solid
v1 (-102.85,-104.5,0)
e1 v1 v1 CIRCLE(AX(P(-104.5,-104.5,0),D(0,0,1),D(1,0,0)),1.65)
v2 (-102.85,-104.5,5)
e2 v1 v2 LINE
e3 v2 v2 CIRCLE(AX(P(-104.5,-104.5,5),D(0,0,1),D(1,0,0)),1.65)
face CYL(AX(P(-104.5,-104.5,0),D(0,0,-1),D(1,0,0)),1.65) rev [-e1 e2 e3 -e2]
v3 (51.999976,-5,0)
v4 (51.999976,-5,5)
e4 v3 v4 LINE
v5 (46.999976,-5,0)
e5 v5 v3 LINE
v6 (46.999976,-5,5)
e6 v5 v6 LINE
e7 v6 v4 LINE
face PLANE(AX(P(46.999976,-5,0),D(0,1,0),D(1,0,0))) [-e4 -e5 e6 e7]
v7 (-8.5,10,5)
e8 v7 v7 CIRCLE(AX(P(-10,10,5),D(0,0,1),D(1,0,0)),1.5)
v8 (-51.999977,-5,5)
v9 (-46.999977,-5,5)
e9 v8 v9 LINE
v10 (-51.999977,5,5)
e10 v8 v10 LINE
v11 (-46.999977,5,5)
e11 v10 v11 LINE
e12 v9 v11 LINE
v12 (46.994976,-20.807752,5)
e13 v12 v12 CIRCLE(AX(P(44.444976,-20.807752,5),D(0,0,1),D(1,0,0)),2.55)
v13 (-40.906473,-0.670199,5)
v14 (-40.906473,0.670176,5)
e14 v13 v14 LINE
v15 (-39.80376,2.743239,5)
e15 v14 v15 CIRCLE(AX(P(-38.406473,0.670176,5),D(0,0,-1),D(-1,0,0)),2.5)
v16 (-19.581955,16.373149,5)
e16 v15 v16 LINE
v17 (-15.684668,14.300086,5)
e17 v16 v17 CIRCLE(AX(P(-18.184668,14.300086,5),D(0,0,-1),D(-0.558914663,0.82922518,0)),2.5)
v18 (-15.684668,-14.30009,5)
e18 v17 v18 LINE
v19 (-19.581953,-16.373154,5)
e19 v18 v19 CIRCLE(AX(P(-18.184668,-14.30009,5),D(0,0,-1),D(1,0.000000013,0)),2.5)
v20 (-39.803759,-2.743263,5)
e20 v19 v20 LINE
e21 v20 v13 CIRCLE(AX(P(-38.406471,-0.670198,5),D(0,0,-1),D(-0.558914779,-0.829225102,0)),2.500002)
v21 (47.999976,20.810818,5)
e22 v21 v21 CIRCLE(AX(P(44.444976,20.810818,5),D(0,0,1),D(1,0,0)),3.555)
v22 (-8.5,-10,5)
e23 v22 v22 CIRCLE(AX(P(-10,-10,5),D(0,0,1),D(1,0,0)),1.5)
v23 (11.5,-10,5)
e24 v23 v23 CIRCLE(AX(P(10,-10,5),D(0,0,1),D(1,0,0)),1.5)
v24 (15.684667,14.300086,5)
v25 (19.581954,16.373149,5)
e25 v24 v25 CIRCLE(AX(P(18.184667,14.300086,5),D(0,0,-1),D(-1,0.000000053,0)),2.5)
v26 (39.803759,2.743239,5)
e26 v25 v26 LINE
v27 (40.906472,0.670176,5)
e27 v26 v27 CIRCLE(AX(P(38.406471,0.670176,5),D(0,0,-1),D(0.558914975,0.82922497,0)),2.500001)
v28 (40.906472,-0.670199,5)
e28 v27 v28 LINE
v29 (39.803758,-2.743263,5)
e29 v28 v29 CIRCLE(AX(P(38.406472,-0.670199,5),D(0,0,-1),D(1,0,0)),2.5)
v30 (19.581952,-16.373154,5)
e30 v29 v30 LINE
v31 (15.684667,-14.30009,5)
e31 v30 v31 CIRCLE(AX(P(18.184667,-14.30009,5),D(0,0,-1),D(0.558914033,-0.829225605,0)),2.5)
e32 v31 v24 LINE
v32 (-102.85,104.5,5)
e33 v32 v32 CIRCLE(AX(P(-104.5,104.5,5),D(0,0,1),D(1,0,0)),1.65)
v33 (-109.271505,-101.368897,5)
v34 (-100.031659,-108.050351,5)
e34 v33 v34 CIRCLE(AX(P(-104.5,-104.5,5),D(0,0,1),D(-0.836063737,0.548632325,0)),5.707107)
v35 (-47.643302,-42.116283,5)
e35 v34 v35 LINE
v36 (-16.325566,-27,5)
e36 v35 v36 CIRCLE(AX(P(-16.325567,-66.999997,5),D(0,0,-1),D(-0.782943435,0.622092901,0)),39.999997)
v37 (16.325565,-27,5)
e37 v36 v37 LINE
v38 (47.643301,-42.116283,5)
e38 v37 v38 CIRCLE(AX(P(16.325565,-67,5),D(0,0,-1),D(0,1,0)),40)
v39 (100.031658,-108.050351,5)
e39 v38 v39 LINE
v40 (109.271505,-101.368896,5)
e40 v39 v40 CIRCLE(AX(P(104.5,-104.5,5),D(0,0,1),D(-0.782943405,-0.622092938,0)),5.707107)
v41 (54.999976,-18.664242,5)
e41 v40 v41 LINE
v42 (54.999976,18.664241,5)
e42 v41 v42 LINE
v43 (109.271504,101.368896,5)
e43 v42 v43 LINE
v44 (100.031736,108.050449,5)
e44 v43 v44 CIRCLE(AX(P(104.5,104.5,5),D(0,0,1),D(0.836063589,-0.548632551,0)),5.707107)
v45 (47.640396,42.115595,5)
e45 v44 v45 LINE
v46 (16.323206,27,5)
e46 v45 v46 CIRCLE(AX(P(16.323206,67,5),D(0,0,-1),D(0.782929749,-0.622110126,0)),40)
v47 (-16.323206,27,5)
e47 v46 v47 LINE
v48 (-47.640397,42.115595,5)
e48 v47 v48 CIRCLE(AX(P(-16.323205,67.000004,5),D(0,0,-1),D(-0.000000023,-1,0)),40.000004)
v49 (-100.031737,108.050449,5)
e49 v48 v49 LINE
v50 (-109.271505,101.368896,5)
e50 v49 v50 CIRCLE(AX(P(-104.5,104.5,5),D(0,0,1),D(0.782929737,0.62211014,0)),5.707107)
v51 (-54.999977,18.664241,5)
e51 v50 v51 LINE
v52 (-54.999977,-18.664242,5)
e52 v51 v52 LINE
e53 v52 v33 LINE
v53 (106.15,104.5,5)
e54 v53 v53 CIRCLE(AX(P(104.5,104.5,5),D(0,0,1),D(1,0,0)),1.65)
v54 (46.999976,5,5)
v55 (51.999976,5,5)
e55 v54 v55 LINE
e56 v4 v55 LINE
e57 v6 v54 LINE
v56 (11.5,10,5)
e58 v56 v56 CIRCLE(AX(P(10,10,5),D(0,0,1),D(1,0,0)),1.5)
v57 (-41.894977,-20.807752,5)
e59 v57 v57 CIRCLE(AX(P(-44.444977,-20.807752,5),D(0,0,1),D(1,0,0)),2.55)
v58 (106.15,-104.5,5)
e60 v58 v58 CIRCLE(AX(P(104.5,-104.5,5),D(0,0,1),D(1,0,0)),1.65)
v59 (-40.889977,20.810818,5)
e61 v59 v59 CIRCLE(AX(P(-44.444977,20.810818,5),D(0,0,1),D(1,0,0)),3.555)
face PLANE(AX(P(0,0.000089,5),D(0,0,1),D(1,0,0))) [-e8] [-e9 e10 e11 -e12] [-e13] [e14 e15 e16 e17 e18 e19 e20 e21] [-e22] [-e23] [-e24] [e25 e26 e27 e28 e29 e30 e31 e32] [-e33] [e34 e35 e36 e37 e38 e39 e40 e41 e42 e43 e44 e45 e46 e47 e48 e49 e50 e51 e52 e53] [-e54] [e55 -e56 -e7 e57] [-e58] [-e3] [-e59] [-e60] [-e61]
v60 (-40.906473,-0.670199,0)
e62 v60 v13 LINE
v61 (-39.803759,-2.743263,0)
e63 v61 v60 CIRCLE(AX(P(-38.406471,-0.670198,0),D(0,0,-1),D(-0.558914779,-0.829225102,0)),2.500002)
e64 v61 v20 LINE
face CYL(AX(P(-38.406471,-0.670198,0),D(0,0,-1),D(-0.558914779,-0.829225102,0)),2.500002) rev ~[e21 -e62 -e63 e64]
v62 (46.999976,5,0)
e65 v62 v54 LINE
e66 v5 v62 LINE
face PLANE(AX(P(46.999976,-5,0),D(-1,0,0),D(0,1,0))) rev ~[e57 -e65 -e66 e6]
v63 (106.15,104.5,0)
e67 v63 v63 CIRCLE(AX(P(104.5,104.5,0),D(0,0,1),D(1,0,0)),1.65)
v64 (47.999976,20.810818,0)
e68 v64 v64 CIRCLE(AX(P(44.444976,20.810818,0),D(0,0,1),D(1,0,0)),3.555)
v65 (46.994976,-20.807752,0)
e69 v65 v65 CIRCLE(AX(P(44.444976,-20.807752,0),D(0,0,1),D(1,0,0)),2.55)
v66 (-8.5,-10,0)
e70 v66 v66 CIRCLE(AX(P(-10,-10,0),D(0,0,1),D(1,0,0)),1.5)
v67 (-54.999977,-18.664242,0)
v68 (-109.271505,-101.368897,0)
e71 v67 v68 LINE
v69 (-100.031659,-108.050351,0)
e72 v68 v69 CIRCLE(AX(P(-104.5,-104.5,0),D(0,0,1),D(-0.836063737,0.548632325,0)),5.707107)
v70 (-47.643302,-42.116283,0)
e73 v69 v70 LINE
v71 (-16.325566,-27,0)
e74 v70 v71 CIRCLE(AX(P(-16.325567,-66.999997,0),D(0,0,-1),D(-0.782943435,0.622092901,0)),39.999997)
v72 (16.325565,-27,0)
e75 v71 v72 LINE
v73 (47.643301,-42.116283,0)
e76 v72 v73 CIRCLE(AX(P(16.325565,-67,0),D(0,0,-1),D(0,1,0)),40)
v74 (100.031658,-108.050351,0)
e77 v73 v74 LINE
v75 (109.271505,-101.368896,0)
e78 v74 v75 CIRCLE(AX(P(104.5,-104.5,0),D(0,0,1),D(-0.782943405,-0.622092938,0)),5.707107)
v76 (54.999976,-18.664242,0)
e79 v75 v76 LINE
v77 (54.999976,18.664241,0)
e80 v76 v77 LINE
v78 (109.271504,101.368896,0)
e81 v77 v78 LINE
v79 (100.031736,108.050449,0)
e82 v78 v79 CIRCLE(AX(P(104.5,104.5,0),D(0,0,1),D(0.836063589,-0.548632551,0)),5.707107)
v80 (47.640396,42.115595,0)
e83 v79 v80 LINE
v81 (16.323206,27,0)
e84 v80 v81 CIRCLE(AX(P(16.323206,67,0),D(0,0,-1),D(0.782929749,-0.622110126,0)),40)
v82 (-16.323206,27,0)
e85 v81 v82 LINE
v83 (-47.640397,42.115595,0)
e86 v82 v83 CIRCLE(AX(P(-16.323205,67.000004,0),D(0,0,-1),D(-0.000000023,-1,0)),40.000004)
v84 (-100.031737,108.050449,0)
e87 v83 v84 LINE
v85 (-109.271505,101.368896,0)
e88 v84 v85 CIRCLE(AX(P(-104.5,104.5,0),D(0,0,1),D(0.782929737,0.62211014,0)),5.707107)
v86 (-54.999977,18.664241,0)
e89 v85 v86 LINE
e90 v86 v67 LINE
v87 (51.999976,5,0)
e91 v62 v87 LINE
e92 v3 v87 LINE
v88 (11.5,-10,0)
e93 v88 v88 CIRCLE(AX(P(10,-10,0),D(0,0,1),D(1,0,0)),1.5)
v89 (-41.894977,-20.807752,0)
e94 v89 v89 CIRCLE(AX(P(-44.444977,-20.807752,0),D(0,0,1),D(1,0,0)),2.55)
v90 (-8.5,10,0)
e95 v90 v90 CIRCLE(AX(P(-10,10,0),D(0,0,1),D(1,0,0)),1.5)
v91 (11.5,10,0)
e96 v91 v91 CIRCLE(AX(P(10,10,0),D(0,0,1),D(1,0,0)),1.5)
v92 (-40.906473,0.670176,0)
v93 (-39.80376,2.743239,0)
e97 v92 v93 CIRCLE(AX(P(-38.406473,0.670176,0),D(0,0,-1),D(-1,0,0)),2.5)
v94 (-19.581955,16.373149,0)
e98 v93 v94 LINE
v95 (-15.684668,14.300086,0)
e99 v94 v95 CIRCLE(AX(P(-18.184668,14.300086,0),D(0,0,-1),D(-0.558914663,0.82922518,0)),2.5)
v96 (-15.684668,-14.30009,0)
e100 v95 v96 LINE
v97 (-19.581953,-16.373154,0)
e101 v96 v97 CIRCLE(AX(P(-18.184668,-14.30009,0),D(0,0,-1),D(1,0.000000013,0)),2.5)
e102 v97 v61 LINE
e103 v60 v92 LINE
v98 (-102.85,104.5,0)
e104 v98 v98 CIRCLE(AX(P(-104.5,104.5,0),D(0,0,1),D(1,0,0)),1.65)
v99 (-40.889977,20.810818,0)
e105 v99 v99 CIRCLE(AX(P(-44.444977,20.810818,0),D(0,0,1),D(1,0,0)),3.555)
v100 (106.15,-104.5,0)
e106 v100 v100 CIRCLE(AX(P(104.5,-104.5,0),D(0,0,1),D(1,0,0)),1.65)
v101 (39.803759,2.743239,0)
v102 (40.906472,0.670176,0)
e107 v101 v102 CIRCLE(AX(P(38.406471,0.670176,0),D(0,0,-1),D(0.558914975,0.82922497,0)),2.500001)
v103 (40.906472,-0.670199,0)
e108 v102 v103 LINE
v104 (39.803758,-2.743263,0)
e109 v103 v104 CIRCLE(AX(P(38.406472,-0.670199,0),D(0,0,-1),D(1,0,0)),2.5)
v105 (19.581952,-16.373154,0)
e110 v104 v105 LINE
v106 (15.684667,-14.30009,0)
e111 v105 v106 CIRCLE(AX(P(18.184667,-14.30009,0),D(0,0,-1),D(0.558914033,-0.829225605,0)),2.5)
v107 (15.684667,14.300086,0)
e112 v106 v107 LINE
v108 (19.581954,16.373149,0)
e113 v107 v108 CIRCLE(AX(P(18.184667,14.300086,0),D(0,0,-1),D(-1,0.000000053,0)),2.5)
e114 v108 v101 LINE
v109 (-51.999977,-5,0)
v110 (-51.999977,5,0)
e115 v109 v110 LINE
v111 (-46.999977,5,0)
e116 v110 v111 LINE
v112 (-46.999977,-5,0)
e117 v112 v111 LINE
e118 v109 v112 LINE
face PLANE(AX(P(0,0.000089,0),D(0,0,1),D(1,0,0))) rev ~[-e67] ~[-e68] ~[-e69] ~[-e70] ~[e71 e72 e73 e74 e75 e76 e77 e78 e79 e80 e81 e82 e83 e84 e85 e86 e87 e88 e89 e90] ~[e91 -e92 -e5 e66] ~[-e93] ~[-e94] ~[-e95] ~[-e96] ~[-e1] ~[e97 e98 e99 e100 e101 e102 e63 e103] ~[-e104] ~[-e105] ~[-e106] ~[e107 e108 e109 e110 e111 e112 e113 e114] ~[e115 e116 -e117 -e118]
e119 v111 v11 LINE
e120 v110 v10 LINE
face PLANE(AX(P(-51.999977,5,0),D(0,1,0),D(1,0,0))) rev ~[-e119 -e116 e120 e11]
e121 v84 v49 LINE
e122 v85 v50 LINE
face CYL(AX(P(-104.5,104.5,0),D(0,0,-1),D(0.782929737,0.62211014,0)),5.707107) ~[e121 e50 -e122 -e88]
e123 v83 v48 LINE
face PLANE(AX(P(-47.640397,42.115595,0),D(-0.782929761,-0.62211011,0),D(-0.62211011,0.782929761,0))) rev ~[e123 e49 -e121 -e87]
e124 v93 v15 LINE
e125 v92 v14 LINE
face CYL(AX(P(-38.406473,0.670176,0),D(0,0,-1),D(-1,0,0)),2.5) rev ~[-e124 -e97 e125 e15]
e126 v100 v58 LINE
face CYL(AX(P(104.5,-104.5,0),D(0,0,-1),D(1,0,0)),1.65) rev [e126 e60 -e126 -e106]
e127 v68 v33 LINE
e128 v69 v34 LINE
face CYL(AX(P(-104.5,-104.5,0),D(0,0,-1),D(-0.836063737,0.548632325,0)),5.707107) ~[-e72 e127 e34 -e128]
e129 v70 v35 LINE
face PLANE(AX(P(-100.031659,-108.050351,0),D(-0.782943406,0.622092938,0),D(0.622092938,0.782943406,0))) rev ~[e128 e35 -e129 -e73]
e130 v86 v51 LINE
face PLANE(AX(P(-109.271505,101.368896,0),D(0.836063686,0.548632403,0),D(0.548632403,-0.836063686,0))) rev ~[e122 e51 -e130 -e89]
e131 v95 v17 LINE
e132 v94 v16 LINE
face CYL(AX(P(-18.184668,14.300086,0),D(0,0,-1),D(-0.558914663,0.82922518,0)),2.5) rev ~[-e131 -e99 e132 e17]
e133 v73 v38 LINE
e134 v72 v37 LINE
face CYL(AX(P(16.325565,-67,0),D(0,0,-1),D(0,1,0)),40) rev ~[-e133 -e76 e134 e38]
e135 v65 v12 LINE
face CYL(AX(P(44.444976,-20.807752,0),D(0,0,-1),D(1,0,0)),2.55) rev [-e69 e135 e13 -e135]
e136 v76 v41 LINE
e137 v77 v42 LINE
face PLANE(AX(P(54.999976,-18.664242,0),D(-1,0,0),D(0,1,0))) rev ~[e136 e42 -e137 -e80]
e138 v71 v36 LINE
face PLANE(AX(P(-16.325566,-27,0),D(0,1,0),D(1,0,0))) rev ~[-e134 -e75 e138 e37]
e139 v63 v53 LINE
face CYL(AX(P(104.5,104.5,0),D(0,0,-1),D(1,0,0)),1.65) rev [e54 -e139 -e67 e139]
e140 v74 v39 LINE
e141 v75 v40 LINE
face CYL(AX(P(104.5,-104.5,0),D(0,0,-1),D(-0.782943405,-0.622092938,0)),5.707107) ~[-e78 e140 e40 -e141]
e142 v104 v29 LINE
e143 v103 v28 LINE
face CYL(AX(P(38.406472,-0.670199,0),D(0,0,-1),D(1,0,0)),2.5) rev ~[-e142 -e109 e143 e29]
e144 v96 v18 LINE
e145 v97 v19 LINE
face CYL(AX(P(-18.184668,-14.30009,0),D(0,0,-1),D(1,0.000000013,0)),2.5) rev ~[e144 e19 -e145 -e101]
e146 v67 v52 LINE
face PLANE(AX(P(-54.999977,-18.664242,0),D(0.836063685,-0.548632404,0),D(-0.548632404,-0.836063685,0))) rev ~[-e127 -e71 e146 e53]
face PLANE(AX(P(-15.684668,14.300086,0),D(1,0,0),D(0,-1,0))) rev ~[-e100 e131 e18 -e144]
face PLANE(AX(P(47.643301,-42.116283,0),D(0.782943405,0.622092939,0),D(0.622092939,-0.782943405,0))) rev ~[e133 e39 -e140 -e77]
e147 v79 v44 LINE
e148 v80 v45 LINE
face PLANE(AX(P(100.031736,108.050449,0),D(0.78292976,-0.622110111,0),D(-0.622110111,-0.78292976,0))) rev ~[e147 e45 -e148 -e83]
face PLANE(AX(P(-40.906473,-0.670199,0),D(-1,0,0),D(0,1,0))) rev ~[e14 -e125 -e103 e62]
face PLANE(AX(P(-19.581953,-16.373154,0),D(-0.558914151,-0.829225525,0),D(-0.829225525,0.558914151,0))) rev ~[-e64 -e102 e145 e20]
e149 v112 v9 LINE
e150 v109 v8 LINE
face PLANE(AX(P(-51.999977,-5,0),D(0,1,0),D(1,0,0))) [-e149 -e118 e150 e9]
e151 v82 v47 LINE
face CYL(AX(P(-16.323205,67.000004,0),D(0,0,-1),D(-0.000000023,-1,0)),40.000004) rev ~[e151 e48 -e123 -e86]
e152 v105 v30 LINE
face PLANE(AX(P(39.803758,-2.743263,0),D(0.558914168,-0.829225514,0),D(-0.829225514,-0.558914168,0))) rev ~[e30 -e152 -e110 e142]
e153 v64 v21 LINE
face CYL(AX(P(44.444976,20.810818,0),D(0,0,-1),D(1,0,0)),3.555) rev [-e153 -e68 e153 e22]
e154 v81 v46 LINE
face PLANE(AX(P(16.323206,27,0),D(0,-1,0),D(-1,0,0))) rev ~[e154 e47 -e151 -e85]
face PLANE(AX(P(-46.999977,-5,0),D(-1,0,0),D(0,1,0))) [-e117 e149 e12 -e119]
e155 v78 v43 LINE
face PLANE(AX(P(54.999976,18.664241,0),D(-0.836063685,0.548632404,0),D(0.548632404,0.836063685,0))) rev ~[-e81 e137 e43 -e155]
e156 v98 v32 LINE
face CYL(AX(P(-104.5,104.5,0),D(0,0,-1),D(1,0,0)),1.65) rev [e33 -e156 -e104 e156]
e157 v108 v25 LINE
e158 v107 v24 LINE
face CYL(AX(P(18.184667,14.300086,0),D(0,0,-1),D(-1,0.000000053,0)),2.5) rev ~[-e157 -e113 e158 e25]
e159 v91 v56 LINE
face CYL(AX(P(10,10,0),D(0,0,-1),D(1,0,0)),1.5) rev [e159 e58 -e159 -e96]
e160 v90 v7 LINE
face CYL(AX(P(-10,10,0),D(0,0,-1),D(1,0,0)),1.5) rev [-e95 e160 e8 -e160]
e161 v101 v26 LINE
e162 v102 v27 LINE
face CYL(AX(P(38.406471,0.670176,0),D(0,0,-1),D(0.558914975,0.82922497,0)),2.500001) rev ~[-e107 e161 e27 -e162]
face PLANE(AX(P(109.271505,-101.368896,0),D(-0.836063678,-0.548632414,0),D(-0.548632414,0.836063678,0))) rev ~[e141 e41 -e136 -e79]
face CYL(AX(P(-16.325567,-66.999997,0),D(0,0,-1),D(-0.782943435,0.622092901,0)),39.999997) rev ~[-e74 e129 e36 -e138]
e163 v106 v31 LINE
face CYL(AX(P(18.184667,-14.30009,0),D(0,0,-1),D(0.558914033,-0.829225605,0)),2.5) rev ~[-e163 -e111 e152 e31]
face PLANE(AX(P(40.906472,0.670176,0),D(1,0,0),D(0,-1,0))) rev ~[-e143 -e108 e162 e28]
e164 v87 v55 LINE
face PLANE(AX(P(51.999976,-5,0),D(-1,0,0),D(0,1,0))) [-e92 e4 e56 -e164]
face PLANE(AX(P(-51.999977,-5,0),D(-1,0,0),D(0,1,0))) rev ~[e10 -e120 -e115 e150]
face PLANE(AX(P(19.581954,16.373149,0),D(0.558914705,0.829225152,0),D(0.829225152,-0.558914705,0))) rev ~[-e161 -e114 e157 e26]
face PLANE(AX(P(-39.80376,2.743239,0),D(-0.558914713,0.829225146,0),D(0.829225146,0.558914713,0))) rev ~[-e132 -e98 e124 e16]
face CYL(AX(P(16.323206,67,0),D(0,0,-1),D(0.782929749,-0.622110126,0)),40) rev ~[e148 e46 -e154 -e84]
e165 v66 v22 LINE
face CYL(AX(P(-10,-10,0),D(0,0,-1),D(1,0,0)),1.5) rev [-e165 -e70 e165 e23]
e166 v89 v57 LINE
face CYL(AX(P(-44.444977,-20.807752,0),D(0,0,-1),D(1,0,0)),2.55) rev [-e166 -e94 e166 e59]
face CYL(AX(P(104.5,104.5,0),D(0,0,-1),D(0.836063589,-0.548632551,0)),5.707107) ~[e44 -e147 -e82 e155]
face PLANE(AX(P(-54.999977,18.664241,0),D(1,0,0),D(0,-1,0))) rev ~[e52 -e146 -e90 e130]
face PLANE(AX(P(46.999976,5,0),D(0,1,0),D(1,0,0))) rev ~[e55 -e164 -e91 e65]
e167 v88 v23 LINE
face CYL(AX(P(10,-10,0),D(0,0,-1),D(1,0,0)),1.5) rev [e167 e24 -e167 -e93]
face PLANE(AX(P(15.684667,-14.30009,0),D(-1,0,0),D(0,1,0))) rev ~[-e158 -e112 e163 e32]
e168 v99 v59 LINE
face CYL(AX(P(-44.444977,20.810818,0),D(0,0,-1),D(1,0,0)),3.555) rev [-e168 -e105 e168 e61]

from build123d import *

# Parameters (mm, degrees)
F0_R     = 1.65
F0_R_2   = 2.55
F0_W     = 5
F0_H     = 10
F0_R_3   = 1.5
F0_R_4   = 3.555
F1_DEPTH = 5


# Not quite as in the source:
# - ends of sketch curves that miss each other by under 0.0002 mm in the source are joined


with BuildPart() as f1:
    # F0 (on Top) → F1 (new body)
    with BuildSketch(Plane.XY):
        with BuildLine():
            Line((-47.640397, 42.115595), (-100.031737, 108.050449))
            ThreePointArc((-100.031737, 108.050449), (-107.8442155419, 109.1246397394), (-109.2715048598, 101.368896092))
            Line((-109.2715048598, 101.368896092), (-54.999977, 18.664241))
            Line((-54.999977, 18.664241), (-54.999977, -18.664242))
            Line((-54.999977, -18.664242), (-109.271505, -101.368897))
            ThreePointArc((-109.271505, -101.368897), (-107.8441644553, -109.1246766812), (-100.031658534, -108.0503513703))
            Line((-100.031658534, -108.0503513703), (-47.643302, -42.116283))
            ThreePointArc((-47.643302, -42.116283), (-33.7130803066, -30.9767526972), (-16.325566, -27))
            Line((-16.325566, -27), (16.325565, -27))
            ThreePointArc((16.325565, -27), (33.7130793066, -30.9767526972), (47.6433013924, -42.1162826882))
            Line((47.6433013924, -42.1162826882), (100.031658, -108.050351))
            ThreePointArc((100.031658, -108.050351), (107.8441644255, -109.1246767027), (109.2715050175, -101.3688963323))
            Line((109.2715050175, -101.3688963323), (54.999976, -18.664242))
            Line((54.999976, -18.664242), (54.999976, 18.664241))
            Line((54.999976, 18.664241), (109.271504, 101.368896))
            ThreePointArc((109.271504, 101.368896), (107.8442155121, 109.1246397609), (100.0317360662, 108.0504489474))
            Line((100.0317360662, 108.0504489474), (47.640396, 42.115595))
            ThreePointArc((47.640396, 42.115595), (33.7103248028, 30.9765618002), (16.323206, 27))
            Line((16.323206, 27), (-16.323206, 27))
            ThreePointArc((-16.323206, 27), (-33.710325083, 30.9765619354), (-47.640397, 42.115595))
        make_face()
        with Locations((-104.5, -104.5)):
            Circle(F0_R, mode=Mode.SUBTRACT)
        with Locations((-44.444977, -20.807752)):
            Circle(F0_R_2, mode=Mode.SUBTRACT)
        with Locations((-49.499977, 0)):
            Rectangle(F0_W, F0_H, mode=Mode.SUBTRACT)
        with BuildLine():
            Line((-19.581953, -16.373154), (-39.803759, -2.743263))
            ThreePointArc((-39.803759, -2.743263), (-40.6136447533, -1.8442487652), (-40.906473, -0.670199))
            Line((-40.906473, -0.670199), (-40.906473, 0.670176))
            ThreePointArc((-40.906473, 0.670176), (-40.6136450793, 1.8442251525), (-39.8037598701, 2.7432388072))
            Line((-39.8037598701, 2.7432388072), (-19.581955, 16.373149))
            ThreePointArc((-19.581955, 16.373149), (-17.0106188475, 16.5072580793), (-15.684668, 14.300086))
            Line((-15.684668, 14.300086), (-15.684668, -14.30009))
            ThreePointArc((-15.684668, -14.30009), (-17.0106178687, -16.5072615586), (-19.581953, -16.373154))
        make_face(mode=Mode.SUBTRACT)
        with Locations((-10, -10)):
            Circle(F0_R_3, mode=Mode.SUBTRACT)
        with Locations((104.5, -104.5)):
            Circle(F0_R, mode=Mode.SUBTRACT)
        with Locations((10, -10)):
            Circle(F0_R_3, mode=Mode.SUBTRACT)
        with Locations((44.444976, -20.807752)):
            Circle(F0_R_2, mode=Mode.SUBTRACT)
        with BuildLine():
            Line((19.581954, 16.373149), (39.803759, 2.743239))
            ThreePointArc((39.803759, 2.743239), (40.6136440793, 1.8442251525), (40.906472, 0.670176))
            Line((40.906472, 0.670176), (40.906472, -0.670199))
            ThreePointArc((40.906472, -0.670199), (40.6136437533, -1.8442487652), (39.803757719, -2.7432625831))
            Line((39.803757719, -2.7432625831), (19.581952, -16.373154))
            ThreePointArc((19.581952, -16.373154), (17.0106168687, -16.5072615586), (15.684667, -14.30009))
            Line((15.684667, -14.30009), (15.684667, 14.300086))
            ThreePointArc((15.684667, 14.300086), (17.0106178475, 16.5072580793), (19.581954, 16.373149))
        make_face(mode=Mode.SUBTRACT)
        with Locations((49.499976, 0)):
            Rectangle(F0_W, F0_H, mode=Mode.SUBTRACT)
        with Locations((-44.444977, 20.810818)):
            Circle(F0_R_4, mode=Mode.SUBTRACT)
        with Locations((-10, 10)):
            Circle(F0_R_3, mode=Mode.SUBTRACT)
        with Locations((-104.5, 104.5)):
            Circle(F0_R, mode=Mode.SUBTRACT)
        with Locations((10, 10)):
            Circle(F0_R_3, mode=Mode.SUBTRACT)
        with Locations((44.444976, 20.810818)):
            Circle(F0_R_4, mode=Mode.SUBTRACT)
        with Locations((104.5, 104.5)):
            Circle(F0_R, mode=Mode.SUBTRACT)
    extrude(amount=F1_DEPTH)


solid = f1.part
